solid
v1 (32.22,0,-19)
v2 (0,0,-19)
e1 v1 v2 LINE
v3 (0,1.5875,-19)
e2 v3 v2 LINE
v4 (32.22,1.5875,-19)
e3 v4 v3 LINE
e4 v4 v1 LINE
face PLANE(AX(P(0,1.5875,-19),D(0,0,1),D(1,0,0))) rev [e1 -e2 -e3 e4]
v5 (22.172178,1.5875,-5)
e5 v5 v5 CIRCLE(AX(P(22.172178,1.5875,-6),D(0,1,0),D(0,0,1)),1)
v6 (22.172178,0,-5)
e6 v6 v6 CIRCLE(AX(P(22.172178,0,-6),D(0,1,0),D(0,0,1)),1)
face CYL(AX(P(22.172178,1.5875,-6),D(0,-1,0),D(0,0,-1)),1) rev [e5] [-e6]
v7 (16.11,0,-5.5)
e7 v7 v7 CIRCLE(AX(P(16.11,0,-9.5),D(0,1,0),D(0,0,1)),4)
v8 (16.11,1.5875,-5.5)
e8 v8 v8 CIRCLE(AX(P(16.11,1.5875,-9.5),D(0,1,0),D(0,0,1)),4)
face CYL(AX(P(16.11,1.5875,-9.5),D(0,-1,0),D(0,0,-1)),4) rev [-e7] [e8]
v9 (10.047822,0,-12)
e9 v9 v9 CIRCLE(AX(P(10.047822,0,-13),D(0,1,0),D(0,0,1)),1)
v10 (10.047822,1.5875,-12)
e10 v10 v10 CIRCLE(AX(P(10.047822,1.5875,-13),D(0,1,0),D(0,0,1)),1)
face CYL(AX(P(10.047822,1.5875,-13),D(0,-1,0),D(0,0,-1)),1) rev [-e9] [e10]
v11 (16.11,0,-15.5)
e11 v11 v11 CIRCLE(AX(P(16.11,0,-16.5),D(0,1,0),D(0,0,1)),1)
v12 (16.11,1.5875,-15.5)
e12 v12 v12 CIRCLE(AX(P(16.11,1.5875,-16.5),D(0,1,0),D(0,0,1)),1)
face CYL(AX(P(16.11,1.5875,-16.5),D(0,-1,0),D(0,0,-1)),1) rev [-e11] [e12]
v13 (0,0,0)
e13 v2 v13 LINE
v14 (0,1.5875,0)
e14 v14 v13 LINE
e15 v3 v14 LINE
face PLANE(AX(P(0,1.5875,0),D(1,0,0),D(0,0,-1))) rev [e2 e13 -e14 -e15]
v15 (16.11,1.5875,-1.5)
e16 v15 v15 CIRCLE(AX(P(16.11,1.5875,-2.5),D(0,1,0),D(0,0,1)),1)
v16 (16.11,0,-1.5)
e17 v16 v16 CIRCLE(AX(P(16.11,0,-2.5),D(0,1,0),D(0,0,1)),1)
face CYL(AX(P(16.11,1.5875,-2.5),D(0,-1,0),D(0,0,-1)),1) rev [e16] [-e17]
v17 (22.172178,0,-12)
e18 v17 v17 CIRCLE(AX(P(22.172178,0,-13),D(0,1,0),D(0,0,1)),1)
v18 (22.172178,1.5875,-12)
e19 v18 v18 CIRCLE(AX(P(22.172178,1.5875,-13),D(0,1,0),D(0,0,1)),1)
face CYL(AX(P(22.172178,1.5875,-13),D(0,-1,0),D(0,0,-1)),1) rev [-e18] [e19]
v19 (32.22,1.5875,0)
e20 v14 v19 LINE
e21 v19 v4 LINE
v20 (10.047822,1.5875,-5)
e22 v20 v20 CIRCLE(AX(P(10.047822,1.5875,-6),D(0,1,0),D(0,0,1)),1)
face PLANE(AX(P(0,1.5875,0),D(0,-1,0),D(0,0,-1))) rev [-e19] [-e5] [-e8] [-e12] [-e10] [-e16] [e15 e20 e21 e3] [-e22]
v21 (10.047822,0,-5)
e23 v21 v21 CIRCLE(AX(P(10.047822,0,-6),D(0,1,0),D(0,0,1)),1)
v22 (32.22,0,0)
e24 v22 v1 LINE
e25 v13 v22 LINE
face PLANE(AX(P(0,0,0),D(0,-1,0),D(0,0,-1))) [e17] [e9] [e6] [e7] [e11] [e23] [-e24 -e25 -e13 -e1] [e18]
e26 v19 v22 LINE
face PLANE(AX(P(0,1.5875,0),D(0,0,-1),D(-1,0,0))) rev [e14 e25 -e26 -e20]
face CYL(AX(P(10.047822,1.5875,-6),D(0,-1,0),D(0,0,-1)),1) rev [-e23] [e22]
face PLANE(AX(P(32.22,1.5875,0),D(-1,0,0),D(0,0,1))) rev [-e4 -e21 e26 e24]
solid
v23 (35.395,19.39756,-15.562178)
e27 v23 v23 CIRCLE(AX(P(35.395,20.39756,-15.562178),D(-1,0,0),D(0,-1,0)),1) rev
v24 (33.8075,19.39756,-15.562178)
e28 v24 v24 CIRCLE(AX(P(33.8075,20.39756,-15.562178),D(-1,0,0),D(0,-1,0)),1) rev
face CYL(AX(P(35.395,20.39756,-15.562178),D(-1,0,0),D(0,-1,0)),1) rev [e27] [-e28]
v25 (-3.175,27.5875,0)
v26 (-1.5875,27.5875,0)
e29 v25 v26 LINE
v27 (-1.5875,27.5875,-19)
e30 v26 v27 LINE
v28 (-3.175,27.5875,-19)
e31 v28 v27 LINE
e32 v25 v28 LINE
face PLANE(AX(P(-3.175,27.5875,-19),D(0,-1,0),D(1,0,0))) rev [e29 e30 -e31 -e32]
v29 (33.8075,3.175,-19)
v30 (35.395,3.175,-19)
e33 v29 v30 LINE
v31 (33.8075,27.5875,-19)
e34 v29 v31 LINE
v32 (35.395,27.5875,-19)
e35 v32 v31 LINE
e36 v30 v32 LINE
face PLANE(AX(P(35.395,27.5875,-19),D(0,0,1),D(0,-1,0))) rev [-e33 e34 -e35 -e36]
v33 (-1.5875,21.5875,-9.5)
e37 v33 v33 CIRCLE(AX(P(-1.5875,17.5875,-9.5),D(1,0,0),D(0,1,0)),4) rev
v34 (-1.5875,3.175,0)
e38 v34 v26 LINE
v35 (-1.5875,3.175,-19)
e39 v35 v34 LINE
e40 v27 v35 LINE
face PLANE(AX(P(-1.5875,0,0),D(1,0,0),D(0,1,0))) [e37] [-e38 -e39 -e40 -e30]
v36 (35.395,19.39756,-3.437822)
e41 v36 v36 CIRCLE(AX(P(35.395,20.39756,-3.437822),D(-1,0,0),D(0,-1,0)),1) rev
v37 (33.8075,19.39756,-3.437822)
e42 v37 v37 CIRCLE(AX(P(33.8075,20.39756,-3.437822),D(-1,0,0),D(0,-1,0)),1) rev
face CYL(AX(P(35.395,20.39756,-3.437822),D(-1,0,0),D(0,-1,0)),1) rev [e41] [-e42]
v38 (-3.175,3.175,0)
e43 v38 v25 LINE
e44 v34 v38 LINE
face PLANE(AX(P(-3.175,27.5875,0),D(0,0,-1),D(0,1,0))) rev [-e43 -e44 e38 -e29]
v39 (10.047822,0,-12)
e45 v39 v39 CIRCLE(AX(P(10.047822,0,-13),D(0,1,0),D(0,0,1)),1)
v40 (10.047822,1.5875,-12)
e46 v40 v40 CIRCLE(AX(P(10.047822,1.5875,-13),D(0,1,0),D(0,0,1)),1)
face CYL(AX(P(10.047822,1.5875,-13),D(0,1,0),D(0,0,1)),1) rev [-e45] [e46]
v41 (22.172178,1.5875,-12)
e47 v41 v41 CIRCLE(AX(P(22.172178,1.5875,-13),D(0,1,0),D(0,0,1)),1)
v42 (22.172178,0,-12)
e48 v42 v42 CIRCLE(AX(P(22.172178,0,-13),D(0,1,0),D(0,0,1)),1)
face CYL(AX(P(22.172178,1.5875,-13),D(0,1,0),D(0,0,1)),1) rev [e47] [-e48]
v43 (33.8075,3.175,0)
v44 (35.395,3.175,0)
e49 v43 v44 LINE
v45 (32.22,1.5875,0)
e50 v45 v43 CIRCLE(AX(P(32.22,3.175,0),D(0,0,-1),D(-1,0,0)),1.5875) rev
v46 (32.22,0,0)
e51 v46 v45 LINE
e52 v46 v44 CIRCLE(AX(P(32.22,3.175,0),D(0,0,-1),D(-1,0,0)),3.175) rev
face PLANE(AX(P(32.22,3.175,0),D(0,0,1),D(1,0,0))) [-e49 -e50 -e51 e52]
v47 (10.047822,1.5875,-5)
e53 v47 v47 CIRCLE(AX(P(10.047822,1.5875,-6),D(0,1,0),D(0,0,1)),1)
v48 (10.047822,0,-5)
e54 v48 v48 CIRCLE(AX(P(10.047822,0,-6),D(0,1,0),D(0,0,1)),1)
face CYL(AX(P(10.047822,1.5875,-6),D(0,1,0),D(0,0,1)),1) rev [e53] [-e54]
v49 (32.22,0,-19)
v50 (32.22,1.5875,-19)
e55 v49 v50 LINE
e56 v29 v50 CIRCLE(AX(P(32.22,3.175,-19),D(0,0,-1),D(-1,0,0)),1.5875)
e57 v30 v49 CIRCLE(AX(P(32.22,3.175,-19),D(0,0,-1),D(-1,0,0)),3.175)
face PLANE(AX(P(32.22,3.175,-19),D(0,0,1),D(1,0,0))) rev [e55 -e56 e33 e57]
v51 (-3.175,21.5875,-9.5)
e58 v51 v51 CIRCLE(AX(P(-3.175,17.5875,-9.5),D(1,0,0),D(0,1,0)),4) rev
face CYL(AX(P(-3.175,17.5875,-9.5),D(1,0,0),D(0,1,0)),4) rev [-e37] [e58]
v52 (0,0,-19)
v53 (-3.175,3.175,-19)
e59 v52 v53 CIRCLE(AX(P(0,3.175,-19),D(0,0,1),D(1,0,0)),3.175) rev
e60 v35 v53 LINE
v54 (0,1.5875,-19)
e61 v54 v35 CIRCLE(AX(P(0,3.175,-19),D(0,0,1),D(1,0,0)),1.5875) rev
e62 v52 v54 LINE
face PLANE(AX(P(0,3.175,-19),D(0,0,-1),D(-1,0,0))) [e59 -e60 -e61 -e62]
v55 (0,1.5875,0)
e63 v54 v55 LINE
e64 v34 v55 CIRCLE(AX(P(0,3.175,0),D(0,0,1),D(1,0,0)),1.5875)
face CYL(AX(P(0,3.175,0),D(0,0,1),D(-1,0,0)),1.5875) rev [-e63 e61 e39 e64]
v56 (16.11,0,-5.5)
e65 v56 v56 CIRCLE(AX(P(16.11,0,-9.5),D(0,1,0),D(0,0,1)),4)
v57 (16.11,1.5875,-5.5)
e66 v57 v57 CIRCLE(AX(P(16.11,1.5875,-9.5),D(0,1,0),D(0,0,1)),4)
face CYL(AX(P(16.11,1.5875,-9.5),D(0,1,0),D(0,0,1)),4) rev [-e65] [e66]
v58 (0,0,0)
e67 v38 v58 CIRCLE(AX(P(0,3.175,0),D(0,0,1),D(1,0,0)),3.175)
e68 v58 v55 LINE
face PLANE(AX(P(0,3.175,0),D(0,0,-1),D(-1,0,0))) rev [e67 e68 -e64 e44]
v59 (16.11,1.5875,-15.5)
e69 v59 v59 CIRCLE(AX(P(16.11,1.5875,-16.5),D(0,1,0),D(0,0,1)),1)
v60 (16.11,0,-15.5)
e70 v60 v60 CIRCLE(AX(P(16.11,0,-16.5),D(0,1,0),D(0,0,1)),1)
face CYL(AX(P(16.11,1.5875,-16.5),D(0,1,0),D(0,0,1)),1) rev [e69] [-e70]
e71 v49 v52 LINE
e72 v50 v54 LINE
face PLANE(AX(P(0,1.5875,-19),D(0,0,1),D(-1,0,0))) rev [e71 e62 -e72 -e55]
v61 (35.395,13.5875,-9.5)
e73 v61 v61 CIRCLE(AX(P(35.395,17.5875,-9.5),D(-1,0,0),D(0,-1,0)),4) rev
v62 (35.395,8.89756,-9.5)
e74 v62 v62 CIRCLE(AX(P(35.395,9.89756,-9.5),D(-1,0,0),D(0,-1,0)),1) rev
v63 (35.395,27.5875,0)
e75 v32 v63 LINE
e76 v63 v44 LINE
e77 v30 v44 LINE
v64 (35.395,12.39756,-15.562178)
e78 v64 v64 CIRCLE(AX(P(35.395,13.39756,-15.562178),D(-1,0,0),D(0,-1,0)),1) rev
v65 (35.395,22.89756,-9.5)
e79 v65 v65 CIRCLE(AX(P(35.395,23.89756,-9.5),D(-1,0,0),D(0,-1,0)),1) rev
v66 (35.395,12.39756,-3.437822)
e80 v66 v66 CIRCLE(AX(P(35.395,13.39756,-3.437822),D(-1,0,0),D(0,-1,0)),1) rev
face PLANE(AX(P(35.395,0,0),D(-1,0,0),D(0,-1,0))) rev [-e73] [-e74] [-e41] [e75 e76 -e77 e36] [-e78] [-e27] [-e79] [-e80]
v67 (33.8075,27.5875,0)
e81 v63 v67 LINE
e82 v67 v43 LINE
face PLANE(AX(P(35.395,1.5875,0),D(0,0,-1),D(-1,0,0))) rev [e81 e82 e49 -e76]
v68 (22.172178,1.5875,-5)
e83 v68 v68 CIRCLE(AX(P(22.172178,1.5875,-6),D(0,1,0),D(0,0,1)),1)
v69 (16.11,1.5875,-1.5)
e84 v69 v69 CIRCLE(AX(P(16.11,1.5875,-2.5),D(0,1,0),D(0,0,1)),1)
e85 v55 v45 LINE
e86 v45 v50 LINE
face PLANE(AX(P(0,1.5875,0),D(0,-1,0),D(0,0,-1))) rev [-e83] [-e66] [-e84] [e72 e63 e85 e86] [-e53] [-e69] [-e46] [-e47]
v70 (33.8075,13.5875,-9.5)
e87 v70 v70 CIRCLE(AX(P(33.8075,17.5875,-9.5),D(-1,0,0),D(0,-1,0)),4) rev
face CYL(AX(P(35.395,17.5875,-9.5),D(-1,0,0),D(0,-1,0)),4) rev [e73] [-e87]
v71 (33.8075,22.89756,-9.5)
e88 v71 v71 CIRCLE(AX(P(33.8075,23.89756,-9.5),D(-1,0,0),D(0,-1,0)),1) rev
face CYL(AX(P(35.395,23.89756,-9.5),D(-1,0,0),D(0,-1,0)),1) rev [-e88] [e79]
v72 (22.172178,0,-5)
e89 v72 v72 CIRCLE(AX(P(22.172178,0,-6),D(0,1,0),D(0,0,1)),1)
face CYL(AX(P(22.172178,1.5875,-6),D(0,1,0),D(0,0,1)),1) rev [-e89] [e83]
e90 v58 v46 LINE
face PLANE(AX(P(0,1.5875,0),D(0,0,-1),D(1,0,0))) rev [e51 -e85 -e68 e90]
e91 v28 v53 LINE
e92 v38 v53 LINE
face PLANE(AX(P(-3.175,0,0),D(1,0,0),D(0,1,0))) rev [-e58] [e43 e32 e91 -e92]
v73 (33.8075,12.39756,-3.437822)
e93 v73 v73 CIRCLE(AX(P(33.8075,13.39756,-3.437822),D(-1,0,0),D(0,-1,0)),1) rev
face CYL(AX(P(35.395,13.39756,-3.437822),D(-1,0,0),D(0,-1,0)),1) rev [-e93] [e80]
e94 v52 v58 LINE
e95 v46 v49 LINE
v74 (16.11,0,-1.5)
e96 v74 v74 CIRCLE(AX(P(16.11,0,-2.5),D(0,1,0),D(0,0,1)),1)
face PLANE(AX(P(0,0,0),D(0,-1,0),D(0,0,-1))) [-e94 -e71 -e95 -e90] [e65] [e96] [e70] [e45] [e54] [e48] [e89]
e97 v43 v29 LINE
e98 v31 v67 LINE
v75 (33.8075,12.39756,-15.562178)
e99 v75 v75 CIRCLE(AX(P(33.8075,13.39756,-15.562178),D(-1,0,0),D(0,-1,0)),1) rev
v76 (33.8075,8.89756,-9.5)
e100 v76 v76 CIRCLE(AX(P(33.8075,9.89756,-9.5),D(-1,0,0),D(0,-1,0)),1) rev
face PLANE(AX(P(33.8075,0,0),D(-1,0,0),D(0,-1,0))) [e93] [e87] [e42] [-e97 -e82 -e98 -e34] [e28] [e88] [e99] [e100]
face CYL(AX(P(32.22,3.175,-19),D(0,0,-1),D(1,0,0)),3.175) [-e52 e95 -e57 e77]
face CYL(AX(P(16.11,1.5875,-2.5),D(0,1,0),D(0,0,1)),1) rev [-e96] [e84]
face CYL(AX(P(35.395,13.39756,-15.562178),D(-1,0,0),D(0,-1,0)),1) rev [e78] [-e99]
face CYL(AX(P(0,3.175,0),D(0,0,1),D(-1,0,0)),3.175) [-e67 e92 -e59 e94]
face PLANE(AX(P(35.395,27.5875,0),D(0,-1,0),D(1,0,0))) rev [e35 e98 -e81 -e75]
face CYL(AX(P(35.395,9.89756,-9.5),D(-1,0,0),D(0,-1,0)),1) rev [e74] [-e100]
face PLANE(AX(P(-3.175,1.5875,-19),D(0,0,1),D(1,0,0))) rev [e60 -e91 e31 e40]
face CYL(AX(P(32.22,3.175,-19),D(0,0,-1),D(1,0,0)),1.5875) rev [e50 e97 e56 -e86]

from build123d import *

# Parameters (mm, degrees)
ESQUISSE1_W                       = 32.22
ESQUISSE1_H                       = 19
ESQUISSE1_R                       = 4
ESQUISSE1_R_2                     = 1
BOSS_EXTRU_2_DEPTH                = 1.5875
CONVERTIR_VOLUME3_OUTLINE_W       = 32.22
CONVERTIR_VOLUME3_OUTLINE_H       = 19
CONVERTIR_VOLUME3_OUTLINE_R       = 1
CONVERTIR_VOLUME3_OUTLINE_R_2     = 4
CONVERTIR_VOLUME3_DEPTH           = 1.5875
T_LE_PLI_E_SUR_AR_TE1_DEPTH       = 19
T_LE_START                        = 1.5875
T_LE_PLI_E_SUR_AR_TE1_PROFILE_W   = 19
T_LE_PLI_E_SUR_AR_TE1_PROFILE_H   = 24.4125
T_LE_PLI_E_SUR_AR_TE1_PROFILE_R   = 4
T_LE_PLI_E_SUR_AR_TE1_FLAT_DEPTH  = 1.5875
T_LE_PLI_E_SUR_AR_TE2_DEPTH       = 19
T_LE_PLI_E_SUR_AR_TE2_PROFILE_W   = 19
T_LE_PLI_E_SUR_AR_TE2_PROFILE_H   = 24.4125
T_LE_PLI_E_SUR_AR_TE2_PROFILE_R   = 1
T_LE_PLI_E_SUR_AR_TE2_PROFILE_R_2 = 4
T_LE_PLI_E_SUR_AR_TE2_FLAT_DEPTH  = 1.5875


# Read off the part's stored shape, not the designer's step: Convertir-Volume3
# Sheet-metal steps are written as plain solids
with BuildPart() as part:
    # Esquisse1 → Boss.-Extru.2 (new body)
    with BuildSketch(Plane(origin=(0, 0, 0), x_dir=(1, 0, 0), z_dir=(0, 1, 0))):
        with Locations((16.11, 9.5)):
            Rectangle(ESQUISSE1_W, ESQUISSE1_H)
        with Locations(Location((16.11, 9.5, 0), (0, 0, 270))):
            Circle(ESQUISSE1_R, mode=Mode.SUBTRACT)
        with Locations(Location((16.11, 16.5, 0), (0, 0, 270))):
            Circle(ESQUISSE1_R_2, mode=Mode.SUBTRACT)
        with Locations(Location((22.172177826, 13, 0), (0, 0, 270))):
            Circle(ESQUISSE1_R_2, mode=Mode.SUBTRACT)
        with Locations(Location((22.172177826, 6, 0), (0, 0, 270))):
            Circle(ESQUISSE1_R_2, mode=Mode.SUBTRACT)
        with Locations(Location((16.11, 2.5, 0), (0, 0, 270))):
            Circle(ESQUISSE1_R_2, mode=Mode.SUBTRACT)
        with Locations(Location((10.047822174, 6, 0), (0, 0, 270))):
            Circle(ESQUISSE1_R_2, mode=Mode.SUBTRACT)
        with Locations(Location((10.047822174, 13, 0), (0, 0, 270))):
            Circle(ESQUISSE1_R_2, mode=Mode.SUBTRACT)
    extrude(amount=BOSS_EXTRU_2_DEPTH)


with BuildPart() as body_2:
    # Convertir-Volume3 outline → Convertir-Volume3 (new body)
    with BuildSketch(Plane(origin=(0, 0, 0), x_dir=(1, 0, 0), z_dir=(0, 1, 0))):
        with Locations((16.11, 9.5)):
            Rectangle(CONVERTIR_VOLUME3_OUTLINE_W, CONVERTIR_VOLUME3_OUTLINE_H)
        with Locations((10.047822174, 6)):
            Circle(CONVERTIR_VOLUME3_OUTLINE_R, mode=Mode.SUBTRACT)
        with Locations((16.11, 2.5)):
            Circle(CONVERTIR_VOLUME3_OUTLINE_R, mode=Mode.SUBTRACT)
        with Locations((22.172177826, 6)):
            Circle(CONVERTIR_VOLUME3_OUTLINE_R, mode=Mode.SUBTRACT)
        with Locations((10.047822174, 13)):
            Circle(CONVERTIR_VOLUME3_OUTLINE_R, mode=Mode.SUBTRACT)
        with Locations((16.11, 9.5)):
            Circle(CONVERTIR_VOLUME3_OUTLINE_R_2, mode=Mode.SUBTRACT)
        with Locations((22.172177826, 13)):
            Circle(CONVERTIR_VOLUME3_OUTLINE_R, mode=Mode.SUBTRACT)
        with Locations((16.11, 16.5)):
            Circle(CONVERTIR_VOLUME3_OUTLINE_R, mode=Mode.SUBTRACT)
    extrude(amount=CONVERTIR_VOLUME3_DEPTH)

    # Tôle pliée sur arête1 bend section (across the edge) → Tôle pliée sur arête1 (add)
    with BuildSketch(Plane(origin=(-1.5875, 1.5875, -19), x_dir=(1, 0, 0), z_dir=(0, 0, 1))):
        with BuildLine():
            Line((-1.5875, 1.5875), (0, 1.5875))
            ThreePointArc((0, 1.5875), (0.464967985, 0.464967985), (1.5875, 0))
            Line((1.5875, 0), (1.5875, -1.5875))
            ThreePointArc((1.5875, -1.5875), (-0.65756403, -0.65756403), (-1.5875, 1.5875))
        make_face()
    extrude(amount=T_LE_PLI_E_SUR_AR_TE1_DEPTH)

    # Tôle pliée sur arête1 profile (on flange) → Tôle pliée sur arête1 flat (add)
    with BuildSketch(Plane(origin=(-1.5875, 1.5875, 0), x_dir=(0, 0, 1), z_dir=(-1, 0, 0)).offset(T_LE_START)):
        with Locations((-9.5, 13.79375)):
            Rectangle(T_LE_PLI_E_SUR_AR_TE1_PROFILE_W, T_LE_PLI_E_SUR_AR_TE1_PROFILE_H)
        with Locations((-9.5, 16)):
            Circle(T_LE_PLI_E_SUR_AR_TE1_PROFILE_R, mode=Mode.SUBTRACT)
    extrude(amount=-T_LE_PLI_E_SUR_AR_TE1_FLAT_DEPTH)

    # Tôle pliée sur arête2 bend section (across the edge) → Tôle pliée sur arête2 (add)
    with BuildSketch(Plane(origin=(33.8075, 1.5875, 0), x_dir=(-1, 0, 0), z_dir=(0, 0, -1))):
        with BuildLine():
            Line((-1.5875, 1.5875), (0, 1.5875))
            ThreePointArc((0, 1.5875), (0.464967985, 0.464967985), (1.5875, 0))
            Line((1.5875, 0), (1.5875, -1.5875))
            ThreePointArc((1.5875, -1.5875), (-0.65756403, -0.65756403), (-1.5875, 1.5875))
        make_face()
    extrude(amount=T_LE_PLI_E_SUR_AR_TE2_DEPTH)

    # Tôle pliée sur arête2 profile (on flange) → Tôle pliée sur arête2 flat (add)
    with BuildSketch(Plane(origin=(33.8075, 1.5875, 0), x_dir=(0, 0, -1), z_dir=(1, 0, 0)).offset(T_LE_START)):
        with Locations((9.5, 13.79375)):
            Rectangle(T_LE_PLI_E_SUR_AR_TE2_PROFILE_W, T_LE_PLI_E_SUR_AR_TE2_PROFILE_H)
        with Locations((9.5, 8.310060418)):
            Circle(T_LE_PLI_E_SUR_AR_TE2_PROFILE_R, mode=Mode.SUBTRACT)
        with Locations((15.562177826, 11.810060418)):
            Circle(T_LE_PLI_E_SUR_AR_TE2_PROFILE_R, mode=Mode.SUBTRACT)
        with Locations((3.437822174, 11.810060418)):
            Circle(T_LE_PLI_E_SUR_AR_TE2_PROFILE_R, mode=Mode.SUBTRACT)
        with Locations((15.562177826, 18.810060418)):
            Circle(T_LE_PLI_E_SUR_AR_TE2_PROFILE_R, mode=Mode.SUBTRACT)
        with Locations((9.5, 16)):
            Circle(T_LE_PLI_E_SUR_AR_TE2_PROFILE_R_2, mode=Mode.SUBTRACT)
        with Locations((3.437822174, 18.810060418)):
            Circle(T_LE_PLI_E_SUR_AR_TE2_PROFILE_R, mode=Mode.SUBTRACT)
        with Locations((9.5, 22.310060418)):
            Circle(T_LE_PLI_E_SUR_AR_TE2_PROFILE_R, mode=Mode.SUBTRACT)
    extrude(amount=-T_LE_PLI_E_SUR_AR_TE2_FLAT_DEPTH)


solid = Compound([part.part, body_2.part])
